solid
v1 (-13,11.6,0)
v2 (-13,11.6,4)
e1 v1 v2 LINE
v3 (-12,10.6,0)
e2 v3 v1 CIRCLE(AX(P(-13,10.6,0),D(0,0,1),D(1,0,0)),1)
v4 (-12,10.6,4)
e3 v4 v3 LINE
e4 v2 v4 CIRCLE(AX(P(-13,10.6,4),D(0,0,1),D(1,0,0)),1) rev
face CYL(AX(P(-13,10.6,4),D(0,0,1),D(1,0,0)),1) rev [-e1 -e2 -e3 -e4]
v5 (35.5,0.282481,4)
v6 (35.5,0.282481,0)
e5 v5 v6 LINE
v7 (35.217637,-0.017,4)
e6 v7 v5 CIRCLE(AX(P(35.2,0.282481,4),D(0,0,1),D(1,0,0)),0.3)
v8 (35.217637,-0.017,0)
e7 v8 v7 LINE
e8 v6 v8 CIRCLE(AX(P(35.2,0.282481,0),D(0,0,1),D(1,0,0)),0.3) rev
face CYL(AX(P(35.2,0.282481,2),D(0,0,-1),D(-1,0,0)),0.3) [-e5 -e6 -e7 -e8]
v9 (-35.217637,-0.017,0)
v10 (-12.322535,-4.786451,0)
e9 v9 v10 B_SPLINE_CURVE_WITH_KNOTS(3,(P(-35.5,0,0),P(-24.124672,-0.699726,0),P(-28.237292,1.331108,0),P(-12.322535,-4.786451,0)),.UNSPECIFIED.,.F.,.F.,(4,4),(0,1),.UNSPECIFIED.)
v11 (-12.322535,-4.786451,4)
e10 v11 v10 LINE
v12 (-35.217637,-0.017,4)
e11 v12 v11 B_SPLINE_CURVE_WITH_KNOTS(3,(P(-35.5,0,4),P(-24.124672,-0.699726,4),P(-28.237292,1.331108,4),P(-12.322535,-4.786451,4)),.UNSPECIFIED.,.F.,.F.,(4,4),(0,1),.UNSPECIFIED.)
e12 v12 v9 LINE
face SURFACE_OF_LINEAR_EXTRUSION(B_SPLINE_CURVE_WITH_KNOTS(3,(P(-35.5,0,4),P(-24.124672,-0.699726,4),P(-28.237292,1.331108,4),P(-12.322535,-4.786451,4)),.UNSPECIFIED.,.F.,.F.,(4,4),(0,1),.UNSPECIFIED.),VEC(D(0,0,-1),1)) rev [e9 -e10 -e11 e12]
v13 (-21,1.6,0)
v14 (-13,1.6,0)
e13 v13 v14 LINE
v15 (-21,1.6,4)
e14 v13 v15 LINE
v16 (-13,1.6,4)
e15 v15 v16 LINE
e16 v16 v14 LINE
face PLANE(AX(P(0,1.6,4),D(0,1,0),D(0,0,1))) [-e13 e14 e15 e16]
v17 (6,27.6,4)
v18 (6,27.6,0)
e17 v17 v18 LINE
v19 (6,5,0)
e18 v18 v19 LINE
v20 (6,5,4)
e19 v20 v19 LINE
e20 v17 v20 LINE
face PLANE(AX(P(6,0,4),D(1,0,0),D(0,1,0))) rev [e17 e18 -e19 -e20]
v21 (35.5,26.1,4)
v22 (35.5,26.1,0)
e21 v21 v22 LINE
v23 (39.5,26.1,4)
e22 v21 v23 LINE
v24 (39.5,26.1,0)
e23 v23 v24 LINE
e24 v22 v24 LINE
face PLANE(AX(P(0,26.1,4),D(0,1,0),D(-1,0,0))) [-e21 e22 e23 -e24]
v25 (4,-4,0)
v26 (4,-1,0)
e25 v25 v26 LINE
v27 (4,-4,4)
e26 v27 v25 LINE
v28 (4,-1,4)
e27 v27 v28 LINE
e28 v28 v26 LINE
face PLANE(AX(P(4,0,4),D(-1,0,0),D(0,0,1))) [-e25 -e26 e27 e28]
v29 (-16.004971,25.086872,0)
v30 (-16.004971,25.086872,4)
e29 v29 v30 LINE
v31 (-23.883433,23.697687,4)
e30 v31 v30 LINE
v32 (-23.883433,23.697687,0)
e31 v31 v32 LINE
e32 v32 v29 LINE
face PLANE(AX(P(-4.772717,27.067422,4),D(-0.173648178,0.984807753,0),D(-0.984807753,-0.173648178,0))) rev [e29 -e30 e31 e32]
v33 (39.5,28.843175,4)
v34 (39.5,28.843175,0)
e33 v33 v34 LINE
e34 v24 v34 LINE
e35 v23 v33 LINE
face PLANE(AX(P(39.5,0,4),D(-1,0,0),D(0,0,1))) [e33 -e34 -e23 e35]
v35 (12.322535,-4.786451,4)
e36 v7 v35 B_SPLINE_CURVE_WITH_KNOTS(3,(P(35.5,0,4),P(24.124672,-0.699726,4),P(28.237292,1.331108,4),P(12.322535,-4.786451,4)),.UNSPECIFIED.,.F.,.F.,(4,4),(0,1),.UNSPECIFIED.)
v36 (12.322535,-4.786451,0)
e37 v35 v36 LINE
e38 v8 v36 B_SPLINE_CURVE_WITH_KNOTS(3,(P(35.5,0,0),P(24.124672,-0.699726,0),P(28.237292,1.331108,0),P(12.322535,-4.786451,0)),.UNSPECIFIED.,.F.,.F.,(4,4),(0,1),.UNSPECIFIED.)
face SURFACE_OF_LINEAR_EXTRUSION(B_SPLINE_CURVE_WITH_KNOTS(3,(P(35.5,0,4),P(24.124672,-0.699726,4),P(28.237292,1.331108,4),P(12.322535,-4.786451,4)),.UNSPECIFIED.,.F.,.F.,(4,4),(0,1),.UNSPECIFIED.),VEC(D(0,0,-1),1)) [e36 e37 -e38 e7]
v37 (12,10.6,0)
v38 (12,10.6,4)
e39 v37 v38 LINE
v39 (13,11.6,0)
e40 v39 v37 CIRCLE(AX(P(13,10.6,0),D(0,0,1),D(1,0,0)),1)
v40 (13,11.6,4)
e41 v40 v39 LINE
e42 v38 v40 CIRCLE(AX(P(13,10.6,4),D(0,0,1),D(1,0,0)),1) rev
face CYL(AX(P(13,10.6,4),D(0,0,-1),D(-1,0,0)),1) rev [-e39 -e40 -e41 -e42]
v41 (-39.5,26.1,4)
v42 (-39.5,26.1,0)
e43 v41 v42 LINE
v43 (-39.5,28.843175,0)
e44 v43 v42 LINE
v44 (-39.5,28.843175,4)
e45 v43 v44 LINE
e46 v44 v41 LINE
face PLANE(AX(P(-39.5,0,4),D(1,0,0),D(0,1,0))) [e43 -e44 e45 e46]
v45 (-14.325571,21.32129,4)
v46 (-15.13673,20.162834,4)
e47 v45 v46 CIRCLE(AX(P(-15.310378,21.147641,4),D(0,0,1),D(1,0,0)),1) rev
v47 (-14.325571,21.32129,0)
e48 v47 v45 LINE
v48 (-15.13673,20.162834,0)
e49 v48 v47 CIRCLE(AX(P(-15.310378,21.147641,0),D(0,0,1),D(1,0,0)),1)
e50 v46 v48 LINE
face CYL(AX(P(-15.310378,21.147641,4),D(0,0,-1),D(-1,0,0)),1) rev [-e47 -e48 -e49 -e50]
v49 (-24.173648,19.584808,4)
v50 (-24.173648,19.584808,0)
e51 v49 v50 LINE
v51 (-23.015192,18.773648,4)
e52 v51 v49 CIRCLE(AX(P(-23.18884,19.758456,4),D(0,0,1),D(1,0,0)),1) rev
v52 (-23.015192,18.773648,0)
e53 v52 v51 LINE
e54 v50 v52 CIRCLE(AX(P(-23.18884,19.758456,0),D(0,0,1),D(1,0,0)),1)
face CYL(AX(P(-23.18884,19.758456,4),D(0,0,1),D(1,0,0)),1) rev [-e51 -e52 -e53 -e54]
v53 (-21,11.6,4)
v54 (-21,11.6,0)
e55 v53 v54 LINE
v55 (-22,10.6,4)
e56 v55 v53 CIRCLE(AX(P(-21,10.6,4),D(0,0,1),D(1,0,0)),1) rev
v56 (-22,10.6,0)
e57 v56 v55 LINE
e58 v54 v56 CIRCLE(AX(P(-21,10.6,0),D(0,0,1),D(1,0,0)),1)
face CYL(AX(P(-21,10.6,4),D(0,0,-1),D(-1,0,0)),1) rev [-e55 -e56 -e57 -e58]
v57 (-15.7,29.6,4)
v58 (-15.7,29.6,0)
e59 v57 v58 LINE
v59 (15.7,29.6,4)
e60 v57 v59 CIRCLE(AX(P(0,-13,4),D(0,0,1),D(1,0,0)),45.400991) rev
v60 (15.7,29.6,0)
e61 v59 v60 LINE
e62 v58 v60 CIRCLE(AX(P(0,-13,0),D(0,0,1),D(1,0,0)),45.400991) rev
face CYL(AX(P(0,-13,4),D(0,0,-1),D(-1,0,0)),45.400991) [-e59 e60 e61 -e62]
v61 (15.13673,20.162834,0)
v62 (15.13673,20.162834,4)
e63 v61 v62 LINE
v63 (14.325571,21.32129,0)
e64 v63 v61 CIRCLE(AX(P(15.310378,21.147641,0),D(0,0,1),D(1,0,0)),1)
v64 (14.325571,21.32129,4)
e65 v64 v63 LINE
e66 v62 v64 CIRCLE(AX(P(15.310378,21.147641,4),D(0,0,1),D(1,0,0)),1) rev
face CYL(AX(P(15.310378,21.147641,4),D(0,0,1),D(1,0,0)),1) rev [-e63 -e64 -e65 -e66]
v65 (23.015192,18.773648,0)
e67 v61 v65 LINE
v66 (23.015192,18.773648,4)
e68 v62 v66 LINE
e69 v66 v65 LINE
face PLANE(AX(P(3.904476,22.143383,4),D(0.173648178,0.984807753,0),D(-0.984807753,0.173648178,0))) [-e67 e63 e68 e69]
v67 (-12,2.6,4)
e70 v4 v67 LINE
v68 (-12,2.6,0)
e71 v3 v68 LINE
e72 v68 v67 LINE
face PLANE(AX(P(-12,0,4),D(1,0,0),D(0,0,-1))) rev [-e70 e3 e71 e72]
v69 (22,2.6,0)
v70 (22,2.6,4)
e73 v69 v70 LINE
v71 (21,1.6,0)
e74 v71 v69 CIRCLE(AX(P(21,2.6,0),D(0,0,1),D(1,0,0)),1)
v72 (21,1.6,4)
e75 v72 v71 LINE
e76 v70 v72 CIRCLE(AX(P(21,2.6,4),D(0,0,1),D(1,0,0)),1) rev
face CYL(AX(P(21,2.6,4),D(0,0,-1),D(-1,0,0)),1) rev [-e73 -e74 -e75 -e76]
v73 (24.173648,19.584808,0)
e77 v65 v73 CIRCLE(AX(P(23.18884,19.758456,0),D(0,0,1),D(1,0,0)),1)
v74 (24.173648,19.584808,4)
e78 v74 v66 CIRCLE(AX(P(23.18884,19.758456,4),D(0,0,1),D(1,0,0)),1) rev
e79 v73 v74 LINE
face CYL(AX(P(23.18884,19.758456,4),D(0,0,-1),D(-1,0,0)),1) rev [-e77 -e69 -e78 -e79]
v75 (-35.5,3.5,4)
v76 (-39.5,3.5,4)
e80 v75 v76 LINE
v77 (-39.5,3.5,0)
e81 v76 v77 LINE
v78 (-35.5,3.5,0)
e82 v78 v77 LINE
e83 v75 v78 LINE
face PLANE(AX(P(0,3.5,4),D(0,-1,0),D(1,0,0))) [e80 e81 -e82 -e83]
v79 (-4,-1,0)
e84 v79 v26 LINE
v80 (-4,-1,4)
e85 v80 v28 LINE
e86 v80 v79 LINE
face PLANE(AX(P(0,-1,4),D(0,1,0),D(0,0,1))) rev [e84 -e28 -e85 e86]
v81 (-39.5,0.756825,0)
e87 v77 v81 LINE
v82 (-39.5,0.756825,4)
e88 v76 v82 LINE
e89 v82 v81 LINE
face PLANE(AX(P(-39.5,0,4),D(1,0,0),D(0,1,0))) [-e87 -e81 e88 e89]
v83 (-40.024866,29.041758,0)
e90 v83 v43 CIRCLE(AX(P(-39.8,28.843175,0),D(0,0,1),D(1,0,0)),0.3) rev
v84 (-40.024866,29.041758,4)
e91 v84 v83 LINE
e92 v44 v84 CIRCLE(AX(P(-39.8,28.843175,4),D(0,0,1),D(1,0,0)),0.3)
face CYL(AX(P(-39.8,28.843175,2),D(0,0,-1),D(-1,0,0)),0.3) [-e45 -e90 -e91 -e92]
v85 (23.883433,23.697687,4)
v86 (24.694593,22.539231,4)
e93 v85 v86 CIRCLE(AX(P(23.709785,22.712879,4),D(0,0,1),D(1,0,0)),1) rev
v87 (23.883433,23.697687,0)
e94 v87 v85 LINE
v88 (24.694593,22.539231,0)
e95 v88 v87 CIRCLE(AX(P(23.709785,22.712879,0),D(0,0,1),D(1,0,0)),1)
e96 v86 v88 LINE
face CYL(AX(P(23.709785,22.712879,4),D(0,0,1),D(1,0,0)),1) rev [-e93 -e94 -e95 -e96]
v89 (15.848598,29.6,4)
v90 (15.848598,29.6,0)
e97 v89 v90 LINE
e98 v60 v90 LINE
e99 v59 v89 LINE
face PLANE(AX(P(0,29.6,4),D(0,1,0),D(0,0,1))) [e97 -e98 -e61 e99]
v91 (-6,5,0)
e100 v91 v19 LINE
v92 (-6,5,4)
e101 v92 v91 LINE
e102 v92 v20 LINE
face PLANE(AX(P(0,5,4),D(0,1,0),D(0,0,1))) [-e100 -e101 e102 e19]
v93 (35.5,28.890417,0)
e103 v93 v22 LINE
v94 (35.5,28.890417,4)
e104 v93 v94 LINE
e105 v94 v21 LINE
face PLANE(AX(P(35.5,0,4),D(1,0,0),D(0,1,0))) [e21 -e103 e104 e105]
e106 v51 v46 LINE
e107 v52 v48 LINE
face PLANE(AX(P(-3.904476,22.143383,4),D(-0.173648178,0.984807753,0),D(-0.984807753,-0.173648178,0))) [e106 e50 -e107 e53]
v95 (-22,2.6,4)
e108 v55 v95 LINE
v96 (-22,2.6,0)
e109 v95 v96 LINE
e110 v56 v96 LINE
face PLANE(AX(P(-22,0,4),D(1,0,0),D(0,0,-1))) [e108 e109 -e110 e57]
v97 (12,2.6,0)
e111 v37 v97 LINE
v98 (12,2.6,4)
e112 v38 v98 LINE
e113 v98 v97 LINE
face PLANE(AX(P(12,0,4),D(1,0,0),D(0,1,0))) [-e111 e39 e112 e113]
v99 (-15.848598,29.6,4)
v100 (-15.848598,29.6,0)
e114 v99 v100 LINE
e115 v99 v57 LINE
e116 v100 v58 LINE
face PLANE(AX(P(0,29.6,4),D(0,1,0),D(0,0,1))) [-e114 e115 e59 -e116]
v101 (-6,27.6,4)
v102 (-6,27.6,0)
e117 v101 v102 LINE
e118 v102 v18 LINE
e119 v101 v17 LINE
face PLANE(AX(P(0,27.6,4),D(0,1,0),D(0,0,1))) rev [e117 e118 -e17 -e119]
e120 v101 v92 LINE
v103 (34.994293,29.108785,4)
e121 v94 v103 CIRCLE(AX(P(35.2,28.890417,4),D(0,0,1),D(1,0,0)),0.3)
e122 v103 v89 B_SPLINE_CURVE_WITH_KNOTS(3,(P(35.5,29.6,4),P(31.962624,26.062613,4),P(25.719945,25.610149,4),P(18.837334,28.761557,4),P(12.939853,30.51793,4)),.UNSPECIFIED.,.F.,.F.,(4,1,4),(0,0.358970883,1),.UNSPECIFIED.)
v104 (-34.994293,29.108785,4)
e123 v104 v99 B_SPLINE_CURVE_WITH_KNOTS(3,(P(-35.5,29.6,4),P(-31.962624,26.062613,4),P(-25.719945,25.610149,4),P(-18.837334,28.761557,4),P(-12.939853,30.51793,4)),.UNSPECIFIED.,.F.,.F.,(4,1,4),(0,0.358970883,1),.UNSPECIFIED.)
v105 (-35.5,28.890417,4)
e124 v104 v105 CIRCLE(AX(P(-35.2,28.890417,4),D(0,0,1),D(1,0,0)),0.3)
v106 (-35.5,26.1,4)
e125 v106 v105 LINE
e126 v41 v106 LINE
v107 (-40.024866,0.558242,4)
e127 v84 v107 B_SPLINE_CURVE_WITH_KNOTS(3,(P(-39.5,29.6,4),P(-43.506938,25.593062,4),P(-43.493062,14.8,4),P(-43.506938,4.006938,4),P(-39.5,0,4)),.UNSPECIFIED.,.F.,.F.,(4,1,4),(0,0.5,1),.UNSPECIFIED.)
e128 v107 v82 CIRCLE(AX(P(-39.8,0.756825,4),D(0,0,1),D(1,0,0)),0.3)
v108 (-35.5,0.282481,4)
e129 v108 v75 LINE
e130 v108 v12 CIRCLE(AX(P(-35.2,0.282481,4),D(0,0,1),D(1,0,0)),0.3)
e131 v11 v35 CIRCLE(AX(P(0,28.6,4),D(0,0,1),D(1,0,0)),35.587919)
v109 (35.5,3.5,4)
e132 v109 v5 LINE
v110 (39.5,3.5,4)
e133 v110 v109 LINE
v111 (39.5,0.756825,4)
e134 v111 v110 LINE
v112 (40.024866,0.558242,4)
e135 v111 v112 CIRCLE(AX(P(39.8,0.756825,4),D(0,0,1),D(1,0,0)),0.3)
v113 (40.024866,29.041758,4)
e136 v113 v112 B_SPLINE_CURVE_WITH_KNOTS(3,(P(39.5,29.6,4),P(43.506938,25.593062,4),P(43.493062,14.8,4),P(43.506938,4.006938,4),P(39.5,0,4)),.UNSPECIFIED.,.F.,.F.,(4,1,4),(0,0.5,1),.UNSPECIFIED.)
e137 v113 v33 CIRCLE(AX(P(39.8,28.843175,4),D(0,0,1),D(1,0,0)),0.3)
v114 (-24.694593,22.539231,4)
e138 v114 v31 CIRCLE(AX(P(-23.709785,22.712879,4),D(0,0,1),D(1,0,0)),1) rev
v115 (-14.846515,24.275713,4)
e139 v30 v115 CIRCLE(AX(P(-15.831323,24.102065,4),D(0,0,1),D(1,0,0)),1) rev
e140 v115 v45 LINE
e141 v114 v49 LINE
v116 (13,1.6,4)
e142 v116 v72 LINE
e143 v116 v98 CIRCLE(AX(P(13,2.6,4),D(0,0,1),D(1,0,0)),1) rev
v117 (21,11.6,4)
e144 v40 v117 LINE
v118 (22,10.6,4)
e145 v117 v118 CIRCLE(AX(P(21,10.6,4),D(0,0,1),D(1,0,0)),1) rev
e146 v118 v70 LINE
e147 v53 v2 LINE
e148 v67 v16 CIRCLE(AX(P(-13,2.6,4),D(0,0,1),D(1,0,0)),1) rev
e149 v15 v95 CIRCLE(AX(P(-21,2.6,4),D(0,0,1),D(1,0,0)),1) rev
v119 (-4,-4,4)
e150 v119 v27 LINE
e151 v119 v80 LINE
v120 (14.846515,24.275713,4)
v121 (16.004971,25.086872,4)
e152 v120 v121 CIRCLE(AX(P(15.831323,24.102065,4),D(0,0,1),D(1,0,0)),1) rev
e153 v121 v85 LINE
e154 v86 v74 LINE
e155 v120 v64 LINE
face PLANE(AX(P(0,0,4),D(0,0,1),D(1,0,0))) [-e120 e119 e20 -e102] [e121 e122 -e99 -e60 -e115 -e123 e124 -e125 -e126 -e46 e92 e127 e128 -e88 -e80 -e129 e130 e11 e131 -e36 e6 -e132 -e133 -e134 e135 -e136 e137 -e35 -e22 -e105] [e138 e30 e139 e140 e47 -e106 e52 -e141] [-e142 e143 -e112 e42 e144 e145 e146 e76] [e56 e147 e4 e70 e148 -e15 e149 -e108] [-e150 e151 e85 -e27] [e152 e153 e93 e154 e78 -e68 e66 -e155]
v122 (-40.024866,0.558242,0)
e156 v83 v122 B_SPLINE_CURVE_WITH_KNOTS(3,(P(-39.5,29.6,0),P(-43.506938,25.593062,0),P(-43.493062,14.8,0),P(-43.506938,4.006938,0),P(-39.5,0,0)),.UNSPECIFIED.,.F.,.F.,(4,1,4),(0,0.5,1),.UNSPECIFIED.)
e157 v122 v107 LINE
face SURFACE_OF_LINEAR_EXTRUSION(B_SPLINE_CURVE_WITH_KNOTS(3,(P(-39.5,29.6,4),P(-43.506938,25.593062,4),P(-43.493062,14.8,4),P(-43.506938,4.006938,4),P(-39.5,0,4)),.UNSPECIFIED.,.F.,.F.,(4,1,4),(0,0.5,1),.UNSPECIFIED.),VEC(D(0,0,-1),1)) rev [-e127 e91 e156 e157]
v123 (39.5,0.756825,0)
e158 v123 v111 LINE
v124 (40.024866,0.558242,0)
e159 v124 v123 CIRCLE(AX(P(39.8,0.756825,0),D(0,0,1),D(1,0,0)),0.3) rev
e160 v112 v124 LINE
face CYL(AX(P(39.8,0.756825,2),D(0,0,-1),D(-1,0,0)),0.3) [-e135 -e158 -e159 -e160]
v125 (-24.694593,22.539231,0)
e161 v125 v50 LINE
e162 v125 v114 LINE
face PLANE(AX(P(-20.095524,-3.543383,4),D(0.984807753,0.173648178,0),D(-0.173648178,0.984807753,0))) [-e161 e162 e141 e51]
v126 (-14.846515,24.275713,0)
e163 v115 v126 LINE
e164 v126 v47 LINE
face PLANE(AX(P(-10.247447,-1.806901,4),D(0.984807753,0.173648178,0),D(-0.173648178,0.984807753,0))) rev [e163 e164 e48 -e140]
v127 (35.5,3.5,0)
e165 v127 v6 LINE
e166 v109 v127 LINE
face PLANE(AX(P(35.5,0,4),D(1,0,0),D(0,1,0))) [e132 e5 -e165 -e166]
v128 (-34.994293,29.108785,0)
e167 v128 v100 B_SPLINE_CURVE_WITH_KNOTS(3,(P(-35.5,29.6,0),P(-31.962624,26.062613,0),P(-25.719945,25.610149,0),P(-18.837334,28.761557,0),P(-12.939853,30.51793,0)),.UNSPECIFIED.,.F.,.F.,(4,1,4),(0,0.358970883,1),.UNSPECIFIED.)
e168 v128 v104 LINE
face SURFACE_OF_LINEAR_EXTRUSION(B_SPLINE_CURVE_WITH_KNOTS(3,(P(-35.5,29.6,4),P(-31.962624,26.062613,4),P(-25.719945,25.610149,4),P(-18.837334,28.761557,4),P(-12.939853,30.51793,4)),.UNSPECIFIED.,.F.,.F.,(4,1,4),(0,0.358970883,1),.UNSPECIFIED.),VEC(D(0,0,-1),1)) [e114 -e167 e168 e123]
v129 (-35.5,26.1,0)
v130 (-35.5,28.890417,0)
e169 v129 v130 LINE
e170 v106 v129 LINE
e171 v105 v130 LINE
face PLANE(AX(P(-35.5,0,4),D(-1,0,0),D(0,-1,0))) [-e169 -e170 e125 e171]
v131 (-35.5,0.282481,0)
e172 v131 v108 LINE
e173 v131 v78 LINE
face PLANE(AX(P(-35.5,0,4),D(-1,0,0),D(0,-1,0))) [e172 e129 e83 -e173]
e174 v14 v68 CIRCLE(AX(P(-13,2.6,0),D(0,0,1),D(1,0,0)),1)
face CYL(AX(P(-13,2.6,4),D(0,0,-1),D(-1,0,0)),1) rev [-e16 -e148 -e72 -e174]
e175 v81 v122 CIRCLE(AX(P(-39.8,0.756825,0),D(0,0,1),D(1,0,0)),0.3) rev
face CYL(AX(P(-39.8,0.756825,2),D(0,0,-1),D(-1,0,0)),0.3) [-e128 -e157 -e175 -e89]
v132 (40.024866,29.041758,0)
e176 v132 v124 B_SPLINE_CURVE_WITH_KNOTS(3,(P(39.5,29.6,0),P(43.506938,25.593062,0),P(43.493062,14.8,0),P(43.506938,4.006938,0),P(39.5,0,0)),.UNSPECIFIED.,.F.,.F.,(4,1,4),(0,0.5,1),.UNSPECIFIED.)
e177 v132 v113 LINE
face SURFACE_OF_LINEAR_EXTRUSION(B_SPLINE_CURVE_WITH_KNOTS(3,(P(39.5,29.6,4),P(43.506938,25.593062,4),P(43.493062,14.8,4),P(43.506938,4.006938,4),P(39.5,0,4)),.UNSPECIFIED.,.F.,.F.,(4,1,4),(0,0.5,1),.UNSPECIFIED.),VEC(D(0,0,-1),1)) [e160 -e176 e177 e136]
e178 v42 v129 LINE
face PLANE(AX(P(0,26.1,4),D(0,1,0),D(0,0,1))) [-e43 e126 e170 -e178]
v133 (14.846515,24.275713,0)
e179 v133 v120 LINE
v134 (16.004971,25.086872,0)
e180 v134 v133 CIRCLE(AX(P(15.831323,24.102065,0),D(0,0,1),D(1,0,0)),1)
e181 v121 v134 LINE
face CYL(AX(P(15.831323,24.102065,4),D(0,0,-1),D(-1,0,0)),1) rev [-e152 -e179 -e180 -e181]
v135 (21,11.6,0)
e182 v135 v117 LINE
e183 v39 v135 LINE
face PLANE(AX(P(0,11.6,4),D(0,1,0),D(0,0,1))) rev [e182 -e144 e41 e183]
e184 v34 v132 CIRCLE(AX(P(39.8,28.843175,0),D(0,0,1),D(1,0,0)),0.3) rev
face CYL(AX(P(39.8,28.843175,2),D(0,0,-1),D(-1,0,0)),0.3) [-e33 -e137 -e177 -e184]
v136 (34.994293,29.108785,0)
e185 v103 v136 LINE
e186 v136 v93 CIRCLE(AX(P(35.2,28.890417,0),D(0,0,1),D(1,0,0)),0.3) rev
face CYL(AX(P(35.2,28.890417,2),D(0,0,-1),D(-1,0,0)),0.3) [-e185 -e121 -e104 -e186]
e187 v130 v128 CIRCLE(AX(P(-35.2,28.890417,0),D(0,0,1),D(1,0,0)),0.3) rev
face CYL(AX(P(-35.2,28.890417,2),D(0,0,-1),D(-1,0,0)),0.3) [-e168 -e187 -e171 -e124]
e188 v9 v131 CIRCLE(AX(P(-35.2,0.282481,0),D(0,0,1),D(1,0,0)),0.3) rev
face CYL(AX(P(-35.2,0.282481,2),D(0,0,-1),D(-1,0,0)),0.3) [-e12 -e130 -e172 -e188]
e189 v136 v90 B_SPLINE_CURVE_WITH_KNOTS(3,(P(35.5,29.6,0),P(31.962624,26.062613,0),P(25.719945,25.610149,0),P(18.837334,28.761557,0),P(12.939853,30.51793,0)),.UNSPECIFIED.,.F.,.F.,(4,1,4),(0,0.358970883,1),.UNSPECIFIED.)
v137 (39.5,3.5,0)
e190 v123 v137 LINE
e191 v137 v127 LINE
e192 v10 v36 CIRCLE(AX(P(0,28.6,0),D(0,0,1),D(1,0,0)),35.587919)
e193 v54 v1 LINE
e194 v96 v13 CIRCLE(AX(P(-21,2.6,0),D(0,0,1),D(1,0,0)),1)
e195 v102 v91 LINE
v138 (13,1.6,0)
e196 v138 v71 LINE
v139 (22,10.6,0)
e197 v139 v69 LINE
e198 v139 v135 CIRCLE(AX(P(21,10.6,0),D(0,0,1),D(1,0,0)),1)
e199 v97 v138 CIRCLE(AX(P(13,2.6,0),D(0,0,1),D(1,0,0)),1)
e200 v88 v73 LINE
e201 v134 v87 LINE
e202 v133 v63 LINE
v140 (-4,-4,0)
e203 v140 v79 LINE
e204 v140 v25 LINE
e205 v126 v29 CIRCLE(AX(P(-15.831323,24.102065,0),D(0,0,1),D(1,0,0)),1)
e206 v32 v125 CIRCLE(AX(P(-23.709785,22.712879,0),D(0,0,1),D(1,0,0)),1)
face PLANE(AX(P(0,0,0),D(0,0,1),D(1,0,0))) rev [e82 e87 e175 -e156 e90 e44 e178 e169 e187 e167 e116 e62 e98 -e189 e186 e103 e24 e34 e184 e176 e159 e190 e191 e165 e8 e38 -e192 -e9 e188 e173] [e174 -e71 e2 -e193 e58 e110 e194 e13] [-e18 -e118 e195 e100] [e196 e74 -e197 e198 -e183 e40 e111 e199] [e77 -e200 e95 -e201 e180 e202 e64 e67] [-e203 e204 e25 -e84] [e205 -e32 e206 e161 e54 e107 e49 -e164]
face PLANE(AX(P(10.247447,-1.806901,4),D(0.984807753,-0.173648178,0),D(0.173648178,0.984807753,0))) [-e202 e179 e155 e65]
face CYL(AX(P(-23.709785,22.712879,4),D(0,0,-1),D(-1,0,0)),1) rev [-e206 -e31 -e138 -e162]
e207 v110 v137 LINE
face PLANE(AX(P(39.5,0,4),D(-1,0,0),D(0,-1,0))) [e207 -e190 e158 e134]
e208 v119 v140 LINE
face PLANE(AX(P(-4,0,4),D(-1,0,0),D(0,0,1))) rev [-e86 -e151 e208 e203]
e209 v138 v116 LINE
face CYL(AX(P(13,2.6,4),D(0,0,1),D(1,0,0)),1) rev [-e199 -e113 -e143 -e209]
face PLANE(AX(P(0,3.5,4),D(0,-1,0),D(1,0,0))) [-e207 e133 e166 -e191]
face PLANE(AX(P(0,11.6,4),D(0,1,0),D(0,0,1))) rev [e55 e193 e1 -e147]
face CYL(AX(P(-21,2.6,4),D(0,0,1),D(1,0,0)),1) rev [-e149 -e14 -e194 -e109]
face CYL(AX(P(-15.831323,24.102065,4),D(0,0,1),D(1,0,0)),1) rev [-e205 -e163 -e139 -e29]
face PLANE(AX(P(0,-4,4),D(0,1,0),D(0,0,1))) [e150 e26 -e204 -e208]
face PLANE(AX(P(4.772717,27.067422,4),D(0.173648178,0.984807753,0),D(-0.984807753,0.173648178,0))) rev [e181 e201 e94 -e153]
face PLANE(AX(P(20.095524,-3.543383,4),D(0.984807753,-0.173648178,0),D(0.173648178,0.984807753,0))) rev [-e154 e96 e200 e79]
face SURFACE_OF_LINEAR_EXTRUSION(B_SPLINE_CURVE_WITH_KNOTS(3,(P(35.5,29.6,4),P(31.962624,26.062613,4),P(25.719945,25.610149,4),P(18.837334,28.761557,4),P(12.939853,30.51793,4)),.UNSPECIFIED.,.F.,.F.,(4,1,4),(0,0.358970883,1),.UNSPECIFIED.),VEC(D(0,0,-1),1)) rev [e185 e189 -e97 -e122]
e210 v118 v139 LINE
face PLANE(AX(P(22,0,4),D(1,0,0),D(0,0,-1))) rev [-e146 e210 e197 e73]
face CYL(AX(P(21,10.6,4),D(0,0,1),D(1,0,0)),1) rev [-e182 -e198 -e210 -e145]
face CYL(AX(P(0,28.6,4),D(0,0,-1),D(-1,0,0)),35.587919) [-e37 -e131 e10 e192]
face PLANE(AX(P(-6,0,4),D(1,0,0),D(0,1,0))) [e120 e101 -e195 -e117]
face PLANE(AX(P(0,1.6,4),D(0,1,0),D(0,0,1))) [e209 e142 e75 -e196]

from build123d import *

# Parameters (mm, degrees)
ESTRUSIONE_ESTRUSIONE1_OUTLINE_W   = 10
ESTRUSIONE_ESTRUSIONE1_OUTLINE_H   = 10
ESTRUSIONE_ESTRUSIONE1_OUTLINE_W_2 = 8
ESTRUSIONE_ESTRUSIONE1_OUTLINE_H_2 = 3
ESTRUSIONE_ESTRUSIONE1_OUTLINE_W_3 = 12
ESTRUSIONE_ESTRUSIONE1_OUTLINE_H_3 = 22.6
ESTRUSIONE_ESTRUSIONE1_DEPTH       = 4
RACCORDO1_R                        = 1
RACCORDO3_R                        = 1
RACCORDO4_R                        = 0.3


# Read off the part's stored shape, not the designer's step: Estrusione-Estrusione1
with BuildPart() as part:
    # Estrusione-Estrusione1 outline → Estrusione-Estrusione1 (new body)
    with BuildSketch(Plane.XY):
        with BuildLine():
            add(Edge.make_bspline(
                [(39.5, 29.6), (43.506938427, 25.593061573), (43.493061573, 14.8), (43.506938427, 4.006938427), (39.5, 0)],
                knots=[0, 0, 0, 0, 0.5, 1, 1, 1, 1], degree=3))
            Line((39.5, 29.6), (39.5, 26.1))
            Line((39.5, 26.1), (35.5, 26.1))
            Line((35.5, 26.1), (35.5, 29.6))
            add(Edge.make_bspline(
                [(35.5, 29.6), (31.962623794, 26.062612753), (26.4060962, 25.659880805), (20.342579531, 28.112334068), (15.848598331, 29.600000017)],
                knots=[0, 0, 0, 0, 0.358970883, 0.890087037, 0.890087037, 0.890087037, 0.890087037], degree=3))
            Line((15.848598331, 29.600000017), (15.7, 29.6))
            ThreePointArc((15.7, 29.6), (0, 32.400991179), (-15.7, 29.6))
            Line((-15.7, 29.6), (-15.848598331, 29.600000017))
            add(Edge.make_bspline(
                [(-35.5, 29.6), (-31.962623794, 26.062612753), (-26.4060962, 25.659880805), (-20.342579531, 28.112334068), (-15.848598331, 29.600000017)],
                knots=[0, 0, 0, 0, 0.358970883, 0.890087037, 0.890087037, 0.890087037, 0.890087037], degree=3))
            Line((-35.5, 29.6), (-35.5, 26.1))
            Line((-35.5, 26.1), (-39.5, 26.1))
            Line((-39.5, 26.1), (-39.5, 29.6))
            add(Edge.make_bspline(
                [(-39.5, 29.6), (-43.506938427, 25.593061573), (-43.493061573, 14.8), (-43.506938427, 4.006938427), (-39.5, 0)],
                knots=[0, 0, 0, 0, 0.5, 1, 1, 1, 1], degree=3))
            Line((-39.5, 0), (-39.5, 3.5))
            Line((-39.5, 3.5), (-35.5, 3.5))
            Line((-35.5, 3.5), (-35.5, 0))
            add(Edge.make_bspline(
                [(-35.5, 0), (-24.124671667, -0.699725618), (-28.237292398, 1.331108434), (-12.322535381, -4.786451171)],
                knots=[0, 0, 0, 0, 1, 1, 1, 1], degree=3))
            ThreePointArc((-12.322535381, -4.786451171), (0, -6.987919299), (12.322535381, -4.786451171))
            add(Edge.make_bspline(
                [(35.5, 0), (24.124671667, -0.699725618), (28.237292398, 1.331108434), (12.322535381, -4.786451171)],
                knots=[0, 0, 0, 0, 1, 1, 1, 1], degree=3))
            Line((35.5, 0), (35.5, 3.5))
            Line((35.5, 3.5), (39.5, 3.5))
            Line((39.5, 3.5), (39.5, 0))
        make_face()
        with Locations((-17, 6.6)):
            Rectangle(ESTRUSIONE_ESTRUSIONE1_OUTLINE_W, ESTRUSIONE_ESTRUSIONE1_OUTLINE_H, mode=Mode.SUBTRACT)
        with Locations((0, -2.5)):
            Rectangle(ESTRUSIONE_ESTRUSIONE1_OUTLINE_W_2, ESTRUSIONE_ESTRUSIONE1_OUTLINE_H_2, mode=Mode.SUBTRACT)
        with Locations((17, 6.6)):
            Rectangle(ESTRUSIONE_ESTRUSIONE1_OUTLINE_W, ESTRUSIONE_ESTRUSIONE1_OUTLINE_H, mode=Mode.SUBTRACT)
        Polygon((-24.868240888, 23.524038765), (-15.020163358, 25.260520542), (-14.15192247, 20.336481777), (-24, 18.6), align=None, mode=Mode.SUBTRACT)
        with Locations((0, 16.3)):
            Rectangle(ESTRUSIONE_ESTRUSIONE1_OUTLINE_W_3, ESTRUSIONE_ESTRUSIONE1_OUTLINE_H_3, mode=Mode.SUBTRACT)
        Polygon((15.020163358, 25.260520542), (24.868240888, 23.524038765), (24, 18.6), (14.15192247, 20.336481777), align=None, mode=Mode.SUBTRACT)
    extrude(amount=ESTRUSIONE_ESTRUSIONE1_DEPTH)

    # Raccordo1
    raccordo1_edges = [part.edges().sort_by_distance(p)[0] for p in [
        (15.020163358, 25.260520542, 2),
        (14.15192247, 20.336481777, 2),
        (24, 18.6, 2),
        (24.868240888, 23.524038765, 2),
        (-24.868240888, 23.524038765, 2),
        (-24, 18.6, 2),
        (-14.15192247, 20.336481777, 2),
        (-15.020163358, 25.260520542, 2),
    ]]
    fillet(raccordo1_edges, radius=RACCORDO1_R)

    # Raccordo3
    raccordo3_edges = [part.edges().sort_by_distance(p)[0] for p in [
        (12, 11.6, 2),
        (12, 1.6, 2),
        (22, 1.6, 2),
        (22, 11.6, 2),
        (-22, 11.6, 2),
        (-22, 1.6, 2),
        (-12, 1.6, 2),
        (-12, 11.6, 2),
    ]]
    fillet(raccordo3_edges, radius=RACCORDO3_R)

    # Raccordo4
    raccordo4_edges = [part.edges().sort_by_distance(p)[0] for p in [
        (-35.5, 0, 2),
        (-39.5, 0, 2),
        (35.5, 0, 2),
        (39.5, 0, 2),
        (39.5, 29.6, 2),
        (35.5, 29.6, 2),
        (-39.5, 29.6, 2),
        (-35.5, 29.6, 2),
    ]]
    fillet(raccordo4_edges, radius=RACCORDO4_R)


solid = part.part
